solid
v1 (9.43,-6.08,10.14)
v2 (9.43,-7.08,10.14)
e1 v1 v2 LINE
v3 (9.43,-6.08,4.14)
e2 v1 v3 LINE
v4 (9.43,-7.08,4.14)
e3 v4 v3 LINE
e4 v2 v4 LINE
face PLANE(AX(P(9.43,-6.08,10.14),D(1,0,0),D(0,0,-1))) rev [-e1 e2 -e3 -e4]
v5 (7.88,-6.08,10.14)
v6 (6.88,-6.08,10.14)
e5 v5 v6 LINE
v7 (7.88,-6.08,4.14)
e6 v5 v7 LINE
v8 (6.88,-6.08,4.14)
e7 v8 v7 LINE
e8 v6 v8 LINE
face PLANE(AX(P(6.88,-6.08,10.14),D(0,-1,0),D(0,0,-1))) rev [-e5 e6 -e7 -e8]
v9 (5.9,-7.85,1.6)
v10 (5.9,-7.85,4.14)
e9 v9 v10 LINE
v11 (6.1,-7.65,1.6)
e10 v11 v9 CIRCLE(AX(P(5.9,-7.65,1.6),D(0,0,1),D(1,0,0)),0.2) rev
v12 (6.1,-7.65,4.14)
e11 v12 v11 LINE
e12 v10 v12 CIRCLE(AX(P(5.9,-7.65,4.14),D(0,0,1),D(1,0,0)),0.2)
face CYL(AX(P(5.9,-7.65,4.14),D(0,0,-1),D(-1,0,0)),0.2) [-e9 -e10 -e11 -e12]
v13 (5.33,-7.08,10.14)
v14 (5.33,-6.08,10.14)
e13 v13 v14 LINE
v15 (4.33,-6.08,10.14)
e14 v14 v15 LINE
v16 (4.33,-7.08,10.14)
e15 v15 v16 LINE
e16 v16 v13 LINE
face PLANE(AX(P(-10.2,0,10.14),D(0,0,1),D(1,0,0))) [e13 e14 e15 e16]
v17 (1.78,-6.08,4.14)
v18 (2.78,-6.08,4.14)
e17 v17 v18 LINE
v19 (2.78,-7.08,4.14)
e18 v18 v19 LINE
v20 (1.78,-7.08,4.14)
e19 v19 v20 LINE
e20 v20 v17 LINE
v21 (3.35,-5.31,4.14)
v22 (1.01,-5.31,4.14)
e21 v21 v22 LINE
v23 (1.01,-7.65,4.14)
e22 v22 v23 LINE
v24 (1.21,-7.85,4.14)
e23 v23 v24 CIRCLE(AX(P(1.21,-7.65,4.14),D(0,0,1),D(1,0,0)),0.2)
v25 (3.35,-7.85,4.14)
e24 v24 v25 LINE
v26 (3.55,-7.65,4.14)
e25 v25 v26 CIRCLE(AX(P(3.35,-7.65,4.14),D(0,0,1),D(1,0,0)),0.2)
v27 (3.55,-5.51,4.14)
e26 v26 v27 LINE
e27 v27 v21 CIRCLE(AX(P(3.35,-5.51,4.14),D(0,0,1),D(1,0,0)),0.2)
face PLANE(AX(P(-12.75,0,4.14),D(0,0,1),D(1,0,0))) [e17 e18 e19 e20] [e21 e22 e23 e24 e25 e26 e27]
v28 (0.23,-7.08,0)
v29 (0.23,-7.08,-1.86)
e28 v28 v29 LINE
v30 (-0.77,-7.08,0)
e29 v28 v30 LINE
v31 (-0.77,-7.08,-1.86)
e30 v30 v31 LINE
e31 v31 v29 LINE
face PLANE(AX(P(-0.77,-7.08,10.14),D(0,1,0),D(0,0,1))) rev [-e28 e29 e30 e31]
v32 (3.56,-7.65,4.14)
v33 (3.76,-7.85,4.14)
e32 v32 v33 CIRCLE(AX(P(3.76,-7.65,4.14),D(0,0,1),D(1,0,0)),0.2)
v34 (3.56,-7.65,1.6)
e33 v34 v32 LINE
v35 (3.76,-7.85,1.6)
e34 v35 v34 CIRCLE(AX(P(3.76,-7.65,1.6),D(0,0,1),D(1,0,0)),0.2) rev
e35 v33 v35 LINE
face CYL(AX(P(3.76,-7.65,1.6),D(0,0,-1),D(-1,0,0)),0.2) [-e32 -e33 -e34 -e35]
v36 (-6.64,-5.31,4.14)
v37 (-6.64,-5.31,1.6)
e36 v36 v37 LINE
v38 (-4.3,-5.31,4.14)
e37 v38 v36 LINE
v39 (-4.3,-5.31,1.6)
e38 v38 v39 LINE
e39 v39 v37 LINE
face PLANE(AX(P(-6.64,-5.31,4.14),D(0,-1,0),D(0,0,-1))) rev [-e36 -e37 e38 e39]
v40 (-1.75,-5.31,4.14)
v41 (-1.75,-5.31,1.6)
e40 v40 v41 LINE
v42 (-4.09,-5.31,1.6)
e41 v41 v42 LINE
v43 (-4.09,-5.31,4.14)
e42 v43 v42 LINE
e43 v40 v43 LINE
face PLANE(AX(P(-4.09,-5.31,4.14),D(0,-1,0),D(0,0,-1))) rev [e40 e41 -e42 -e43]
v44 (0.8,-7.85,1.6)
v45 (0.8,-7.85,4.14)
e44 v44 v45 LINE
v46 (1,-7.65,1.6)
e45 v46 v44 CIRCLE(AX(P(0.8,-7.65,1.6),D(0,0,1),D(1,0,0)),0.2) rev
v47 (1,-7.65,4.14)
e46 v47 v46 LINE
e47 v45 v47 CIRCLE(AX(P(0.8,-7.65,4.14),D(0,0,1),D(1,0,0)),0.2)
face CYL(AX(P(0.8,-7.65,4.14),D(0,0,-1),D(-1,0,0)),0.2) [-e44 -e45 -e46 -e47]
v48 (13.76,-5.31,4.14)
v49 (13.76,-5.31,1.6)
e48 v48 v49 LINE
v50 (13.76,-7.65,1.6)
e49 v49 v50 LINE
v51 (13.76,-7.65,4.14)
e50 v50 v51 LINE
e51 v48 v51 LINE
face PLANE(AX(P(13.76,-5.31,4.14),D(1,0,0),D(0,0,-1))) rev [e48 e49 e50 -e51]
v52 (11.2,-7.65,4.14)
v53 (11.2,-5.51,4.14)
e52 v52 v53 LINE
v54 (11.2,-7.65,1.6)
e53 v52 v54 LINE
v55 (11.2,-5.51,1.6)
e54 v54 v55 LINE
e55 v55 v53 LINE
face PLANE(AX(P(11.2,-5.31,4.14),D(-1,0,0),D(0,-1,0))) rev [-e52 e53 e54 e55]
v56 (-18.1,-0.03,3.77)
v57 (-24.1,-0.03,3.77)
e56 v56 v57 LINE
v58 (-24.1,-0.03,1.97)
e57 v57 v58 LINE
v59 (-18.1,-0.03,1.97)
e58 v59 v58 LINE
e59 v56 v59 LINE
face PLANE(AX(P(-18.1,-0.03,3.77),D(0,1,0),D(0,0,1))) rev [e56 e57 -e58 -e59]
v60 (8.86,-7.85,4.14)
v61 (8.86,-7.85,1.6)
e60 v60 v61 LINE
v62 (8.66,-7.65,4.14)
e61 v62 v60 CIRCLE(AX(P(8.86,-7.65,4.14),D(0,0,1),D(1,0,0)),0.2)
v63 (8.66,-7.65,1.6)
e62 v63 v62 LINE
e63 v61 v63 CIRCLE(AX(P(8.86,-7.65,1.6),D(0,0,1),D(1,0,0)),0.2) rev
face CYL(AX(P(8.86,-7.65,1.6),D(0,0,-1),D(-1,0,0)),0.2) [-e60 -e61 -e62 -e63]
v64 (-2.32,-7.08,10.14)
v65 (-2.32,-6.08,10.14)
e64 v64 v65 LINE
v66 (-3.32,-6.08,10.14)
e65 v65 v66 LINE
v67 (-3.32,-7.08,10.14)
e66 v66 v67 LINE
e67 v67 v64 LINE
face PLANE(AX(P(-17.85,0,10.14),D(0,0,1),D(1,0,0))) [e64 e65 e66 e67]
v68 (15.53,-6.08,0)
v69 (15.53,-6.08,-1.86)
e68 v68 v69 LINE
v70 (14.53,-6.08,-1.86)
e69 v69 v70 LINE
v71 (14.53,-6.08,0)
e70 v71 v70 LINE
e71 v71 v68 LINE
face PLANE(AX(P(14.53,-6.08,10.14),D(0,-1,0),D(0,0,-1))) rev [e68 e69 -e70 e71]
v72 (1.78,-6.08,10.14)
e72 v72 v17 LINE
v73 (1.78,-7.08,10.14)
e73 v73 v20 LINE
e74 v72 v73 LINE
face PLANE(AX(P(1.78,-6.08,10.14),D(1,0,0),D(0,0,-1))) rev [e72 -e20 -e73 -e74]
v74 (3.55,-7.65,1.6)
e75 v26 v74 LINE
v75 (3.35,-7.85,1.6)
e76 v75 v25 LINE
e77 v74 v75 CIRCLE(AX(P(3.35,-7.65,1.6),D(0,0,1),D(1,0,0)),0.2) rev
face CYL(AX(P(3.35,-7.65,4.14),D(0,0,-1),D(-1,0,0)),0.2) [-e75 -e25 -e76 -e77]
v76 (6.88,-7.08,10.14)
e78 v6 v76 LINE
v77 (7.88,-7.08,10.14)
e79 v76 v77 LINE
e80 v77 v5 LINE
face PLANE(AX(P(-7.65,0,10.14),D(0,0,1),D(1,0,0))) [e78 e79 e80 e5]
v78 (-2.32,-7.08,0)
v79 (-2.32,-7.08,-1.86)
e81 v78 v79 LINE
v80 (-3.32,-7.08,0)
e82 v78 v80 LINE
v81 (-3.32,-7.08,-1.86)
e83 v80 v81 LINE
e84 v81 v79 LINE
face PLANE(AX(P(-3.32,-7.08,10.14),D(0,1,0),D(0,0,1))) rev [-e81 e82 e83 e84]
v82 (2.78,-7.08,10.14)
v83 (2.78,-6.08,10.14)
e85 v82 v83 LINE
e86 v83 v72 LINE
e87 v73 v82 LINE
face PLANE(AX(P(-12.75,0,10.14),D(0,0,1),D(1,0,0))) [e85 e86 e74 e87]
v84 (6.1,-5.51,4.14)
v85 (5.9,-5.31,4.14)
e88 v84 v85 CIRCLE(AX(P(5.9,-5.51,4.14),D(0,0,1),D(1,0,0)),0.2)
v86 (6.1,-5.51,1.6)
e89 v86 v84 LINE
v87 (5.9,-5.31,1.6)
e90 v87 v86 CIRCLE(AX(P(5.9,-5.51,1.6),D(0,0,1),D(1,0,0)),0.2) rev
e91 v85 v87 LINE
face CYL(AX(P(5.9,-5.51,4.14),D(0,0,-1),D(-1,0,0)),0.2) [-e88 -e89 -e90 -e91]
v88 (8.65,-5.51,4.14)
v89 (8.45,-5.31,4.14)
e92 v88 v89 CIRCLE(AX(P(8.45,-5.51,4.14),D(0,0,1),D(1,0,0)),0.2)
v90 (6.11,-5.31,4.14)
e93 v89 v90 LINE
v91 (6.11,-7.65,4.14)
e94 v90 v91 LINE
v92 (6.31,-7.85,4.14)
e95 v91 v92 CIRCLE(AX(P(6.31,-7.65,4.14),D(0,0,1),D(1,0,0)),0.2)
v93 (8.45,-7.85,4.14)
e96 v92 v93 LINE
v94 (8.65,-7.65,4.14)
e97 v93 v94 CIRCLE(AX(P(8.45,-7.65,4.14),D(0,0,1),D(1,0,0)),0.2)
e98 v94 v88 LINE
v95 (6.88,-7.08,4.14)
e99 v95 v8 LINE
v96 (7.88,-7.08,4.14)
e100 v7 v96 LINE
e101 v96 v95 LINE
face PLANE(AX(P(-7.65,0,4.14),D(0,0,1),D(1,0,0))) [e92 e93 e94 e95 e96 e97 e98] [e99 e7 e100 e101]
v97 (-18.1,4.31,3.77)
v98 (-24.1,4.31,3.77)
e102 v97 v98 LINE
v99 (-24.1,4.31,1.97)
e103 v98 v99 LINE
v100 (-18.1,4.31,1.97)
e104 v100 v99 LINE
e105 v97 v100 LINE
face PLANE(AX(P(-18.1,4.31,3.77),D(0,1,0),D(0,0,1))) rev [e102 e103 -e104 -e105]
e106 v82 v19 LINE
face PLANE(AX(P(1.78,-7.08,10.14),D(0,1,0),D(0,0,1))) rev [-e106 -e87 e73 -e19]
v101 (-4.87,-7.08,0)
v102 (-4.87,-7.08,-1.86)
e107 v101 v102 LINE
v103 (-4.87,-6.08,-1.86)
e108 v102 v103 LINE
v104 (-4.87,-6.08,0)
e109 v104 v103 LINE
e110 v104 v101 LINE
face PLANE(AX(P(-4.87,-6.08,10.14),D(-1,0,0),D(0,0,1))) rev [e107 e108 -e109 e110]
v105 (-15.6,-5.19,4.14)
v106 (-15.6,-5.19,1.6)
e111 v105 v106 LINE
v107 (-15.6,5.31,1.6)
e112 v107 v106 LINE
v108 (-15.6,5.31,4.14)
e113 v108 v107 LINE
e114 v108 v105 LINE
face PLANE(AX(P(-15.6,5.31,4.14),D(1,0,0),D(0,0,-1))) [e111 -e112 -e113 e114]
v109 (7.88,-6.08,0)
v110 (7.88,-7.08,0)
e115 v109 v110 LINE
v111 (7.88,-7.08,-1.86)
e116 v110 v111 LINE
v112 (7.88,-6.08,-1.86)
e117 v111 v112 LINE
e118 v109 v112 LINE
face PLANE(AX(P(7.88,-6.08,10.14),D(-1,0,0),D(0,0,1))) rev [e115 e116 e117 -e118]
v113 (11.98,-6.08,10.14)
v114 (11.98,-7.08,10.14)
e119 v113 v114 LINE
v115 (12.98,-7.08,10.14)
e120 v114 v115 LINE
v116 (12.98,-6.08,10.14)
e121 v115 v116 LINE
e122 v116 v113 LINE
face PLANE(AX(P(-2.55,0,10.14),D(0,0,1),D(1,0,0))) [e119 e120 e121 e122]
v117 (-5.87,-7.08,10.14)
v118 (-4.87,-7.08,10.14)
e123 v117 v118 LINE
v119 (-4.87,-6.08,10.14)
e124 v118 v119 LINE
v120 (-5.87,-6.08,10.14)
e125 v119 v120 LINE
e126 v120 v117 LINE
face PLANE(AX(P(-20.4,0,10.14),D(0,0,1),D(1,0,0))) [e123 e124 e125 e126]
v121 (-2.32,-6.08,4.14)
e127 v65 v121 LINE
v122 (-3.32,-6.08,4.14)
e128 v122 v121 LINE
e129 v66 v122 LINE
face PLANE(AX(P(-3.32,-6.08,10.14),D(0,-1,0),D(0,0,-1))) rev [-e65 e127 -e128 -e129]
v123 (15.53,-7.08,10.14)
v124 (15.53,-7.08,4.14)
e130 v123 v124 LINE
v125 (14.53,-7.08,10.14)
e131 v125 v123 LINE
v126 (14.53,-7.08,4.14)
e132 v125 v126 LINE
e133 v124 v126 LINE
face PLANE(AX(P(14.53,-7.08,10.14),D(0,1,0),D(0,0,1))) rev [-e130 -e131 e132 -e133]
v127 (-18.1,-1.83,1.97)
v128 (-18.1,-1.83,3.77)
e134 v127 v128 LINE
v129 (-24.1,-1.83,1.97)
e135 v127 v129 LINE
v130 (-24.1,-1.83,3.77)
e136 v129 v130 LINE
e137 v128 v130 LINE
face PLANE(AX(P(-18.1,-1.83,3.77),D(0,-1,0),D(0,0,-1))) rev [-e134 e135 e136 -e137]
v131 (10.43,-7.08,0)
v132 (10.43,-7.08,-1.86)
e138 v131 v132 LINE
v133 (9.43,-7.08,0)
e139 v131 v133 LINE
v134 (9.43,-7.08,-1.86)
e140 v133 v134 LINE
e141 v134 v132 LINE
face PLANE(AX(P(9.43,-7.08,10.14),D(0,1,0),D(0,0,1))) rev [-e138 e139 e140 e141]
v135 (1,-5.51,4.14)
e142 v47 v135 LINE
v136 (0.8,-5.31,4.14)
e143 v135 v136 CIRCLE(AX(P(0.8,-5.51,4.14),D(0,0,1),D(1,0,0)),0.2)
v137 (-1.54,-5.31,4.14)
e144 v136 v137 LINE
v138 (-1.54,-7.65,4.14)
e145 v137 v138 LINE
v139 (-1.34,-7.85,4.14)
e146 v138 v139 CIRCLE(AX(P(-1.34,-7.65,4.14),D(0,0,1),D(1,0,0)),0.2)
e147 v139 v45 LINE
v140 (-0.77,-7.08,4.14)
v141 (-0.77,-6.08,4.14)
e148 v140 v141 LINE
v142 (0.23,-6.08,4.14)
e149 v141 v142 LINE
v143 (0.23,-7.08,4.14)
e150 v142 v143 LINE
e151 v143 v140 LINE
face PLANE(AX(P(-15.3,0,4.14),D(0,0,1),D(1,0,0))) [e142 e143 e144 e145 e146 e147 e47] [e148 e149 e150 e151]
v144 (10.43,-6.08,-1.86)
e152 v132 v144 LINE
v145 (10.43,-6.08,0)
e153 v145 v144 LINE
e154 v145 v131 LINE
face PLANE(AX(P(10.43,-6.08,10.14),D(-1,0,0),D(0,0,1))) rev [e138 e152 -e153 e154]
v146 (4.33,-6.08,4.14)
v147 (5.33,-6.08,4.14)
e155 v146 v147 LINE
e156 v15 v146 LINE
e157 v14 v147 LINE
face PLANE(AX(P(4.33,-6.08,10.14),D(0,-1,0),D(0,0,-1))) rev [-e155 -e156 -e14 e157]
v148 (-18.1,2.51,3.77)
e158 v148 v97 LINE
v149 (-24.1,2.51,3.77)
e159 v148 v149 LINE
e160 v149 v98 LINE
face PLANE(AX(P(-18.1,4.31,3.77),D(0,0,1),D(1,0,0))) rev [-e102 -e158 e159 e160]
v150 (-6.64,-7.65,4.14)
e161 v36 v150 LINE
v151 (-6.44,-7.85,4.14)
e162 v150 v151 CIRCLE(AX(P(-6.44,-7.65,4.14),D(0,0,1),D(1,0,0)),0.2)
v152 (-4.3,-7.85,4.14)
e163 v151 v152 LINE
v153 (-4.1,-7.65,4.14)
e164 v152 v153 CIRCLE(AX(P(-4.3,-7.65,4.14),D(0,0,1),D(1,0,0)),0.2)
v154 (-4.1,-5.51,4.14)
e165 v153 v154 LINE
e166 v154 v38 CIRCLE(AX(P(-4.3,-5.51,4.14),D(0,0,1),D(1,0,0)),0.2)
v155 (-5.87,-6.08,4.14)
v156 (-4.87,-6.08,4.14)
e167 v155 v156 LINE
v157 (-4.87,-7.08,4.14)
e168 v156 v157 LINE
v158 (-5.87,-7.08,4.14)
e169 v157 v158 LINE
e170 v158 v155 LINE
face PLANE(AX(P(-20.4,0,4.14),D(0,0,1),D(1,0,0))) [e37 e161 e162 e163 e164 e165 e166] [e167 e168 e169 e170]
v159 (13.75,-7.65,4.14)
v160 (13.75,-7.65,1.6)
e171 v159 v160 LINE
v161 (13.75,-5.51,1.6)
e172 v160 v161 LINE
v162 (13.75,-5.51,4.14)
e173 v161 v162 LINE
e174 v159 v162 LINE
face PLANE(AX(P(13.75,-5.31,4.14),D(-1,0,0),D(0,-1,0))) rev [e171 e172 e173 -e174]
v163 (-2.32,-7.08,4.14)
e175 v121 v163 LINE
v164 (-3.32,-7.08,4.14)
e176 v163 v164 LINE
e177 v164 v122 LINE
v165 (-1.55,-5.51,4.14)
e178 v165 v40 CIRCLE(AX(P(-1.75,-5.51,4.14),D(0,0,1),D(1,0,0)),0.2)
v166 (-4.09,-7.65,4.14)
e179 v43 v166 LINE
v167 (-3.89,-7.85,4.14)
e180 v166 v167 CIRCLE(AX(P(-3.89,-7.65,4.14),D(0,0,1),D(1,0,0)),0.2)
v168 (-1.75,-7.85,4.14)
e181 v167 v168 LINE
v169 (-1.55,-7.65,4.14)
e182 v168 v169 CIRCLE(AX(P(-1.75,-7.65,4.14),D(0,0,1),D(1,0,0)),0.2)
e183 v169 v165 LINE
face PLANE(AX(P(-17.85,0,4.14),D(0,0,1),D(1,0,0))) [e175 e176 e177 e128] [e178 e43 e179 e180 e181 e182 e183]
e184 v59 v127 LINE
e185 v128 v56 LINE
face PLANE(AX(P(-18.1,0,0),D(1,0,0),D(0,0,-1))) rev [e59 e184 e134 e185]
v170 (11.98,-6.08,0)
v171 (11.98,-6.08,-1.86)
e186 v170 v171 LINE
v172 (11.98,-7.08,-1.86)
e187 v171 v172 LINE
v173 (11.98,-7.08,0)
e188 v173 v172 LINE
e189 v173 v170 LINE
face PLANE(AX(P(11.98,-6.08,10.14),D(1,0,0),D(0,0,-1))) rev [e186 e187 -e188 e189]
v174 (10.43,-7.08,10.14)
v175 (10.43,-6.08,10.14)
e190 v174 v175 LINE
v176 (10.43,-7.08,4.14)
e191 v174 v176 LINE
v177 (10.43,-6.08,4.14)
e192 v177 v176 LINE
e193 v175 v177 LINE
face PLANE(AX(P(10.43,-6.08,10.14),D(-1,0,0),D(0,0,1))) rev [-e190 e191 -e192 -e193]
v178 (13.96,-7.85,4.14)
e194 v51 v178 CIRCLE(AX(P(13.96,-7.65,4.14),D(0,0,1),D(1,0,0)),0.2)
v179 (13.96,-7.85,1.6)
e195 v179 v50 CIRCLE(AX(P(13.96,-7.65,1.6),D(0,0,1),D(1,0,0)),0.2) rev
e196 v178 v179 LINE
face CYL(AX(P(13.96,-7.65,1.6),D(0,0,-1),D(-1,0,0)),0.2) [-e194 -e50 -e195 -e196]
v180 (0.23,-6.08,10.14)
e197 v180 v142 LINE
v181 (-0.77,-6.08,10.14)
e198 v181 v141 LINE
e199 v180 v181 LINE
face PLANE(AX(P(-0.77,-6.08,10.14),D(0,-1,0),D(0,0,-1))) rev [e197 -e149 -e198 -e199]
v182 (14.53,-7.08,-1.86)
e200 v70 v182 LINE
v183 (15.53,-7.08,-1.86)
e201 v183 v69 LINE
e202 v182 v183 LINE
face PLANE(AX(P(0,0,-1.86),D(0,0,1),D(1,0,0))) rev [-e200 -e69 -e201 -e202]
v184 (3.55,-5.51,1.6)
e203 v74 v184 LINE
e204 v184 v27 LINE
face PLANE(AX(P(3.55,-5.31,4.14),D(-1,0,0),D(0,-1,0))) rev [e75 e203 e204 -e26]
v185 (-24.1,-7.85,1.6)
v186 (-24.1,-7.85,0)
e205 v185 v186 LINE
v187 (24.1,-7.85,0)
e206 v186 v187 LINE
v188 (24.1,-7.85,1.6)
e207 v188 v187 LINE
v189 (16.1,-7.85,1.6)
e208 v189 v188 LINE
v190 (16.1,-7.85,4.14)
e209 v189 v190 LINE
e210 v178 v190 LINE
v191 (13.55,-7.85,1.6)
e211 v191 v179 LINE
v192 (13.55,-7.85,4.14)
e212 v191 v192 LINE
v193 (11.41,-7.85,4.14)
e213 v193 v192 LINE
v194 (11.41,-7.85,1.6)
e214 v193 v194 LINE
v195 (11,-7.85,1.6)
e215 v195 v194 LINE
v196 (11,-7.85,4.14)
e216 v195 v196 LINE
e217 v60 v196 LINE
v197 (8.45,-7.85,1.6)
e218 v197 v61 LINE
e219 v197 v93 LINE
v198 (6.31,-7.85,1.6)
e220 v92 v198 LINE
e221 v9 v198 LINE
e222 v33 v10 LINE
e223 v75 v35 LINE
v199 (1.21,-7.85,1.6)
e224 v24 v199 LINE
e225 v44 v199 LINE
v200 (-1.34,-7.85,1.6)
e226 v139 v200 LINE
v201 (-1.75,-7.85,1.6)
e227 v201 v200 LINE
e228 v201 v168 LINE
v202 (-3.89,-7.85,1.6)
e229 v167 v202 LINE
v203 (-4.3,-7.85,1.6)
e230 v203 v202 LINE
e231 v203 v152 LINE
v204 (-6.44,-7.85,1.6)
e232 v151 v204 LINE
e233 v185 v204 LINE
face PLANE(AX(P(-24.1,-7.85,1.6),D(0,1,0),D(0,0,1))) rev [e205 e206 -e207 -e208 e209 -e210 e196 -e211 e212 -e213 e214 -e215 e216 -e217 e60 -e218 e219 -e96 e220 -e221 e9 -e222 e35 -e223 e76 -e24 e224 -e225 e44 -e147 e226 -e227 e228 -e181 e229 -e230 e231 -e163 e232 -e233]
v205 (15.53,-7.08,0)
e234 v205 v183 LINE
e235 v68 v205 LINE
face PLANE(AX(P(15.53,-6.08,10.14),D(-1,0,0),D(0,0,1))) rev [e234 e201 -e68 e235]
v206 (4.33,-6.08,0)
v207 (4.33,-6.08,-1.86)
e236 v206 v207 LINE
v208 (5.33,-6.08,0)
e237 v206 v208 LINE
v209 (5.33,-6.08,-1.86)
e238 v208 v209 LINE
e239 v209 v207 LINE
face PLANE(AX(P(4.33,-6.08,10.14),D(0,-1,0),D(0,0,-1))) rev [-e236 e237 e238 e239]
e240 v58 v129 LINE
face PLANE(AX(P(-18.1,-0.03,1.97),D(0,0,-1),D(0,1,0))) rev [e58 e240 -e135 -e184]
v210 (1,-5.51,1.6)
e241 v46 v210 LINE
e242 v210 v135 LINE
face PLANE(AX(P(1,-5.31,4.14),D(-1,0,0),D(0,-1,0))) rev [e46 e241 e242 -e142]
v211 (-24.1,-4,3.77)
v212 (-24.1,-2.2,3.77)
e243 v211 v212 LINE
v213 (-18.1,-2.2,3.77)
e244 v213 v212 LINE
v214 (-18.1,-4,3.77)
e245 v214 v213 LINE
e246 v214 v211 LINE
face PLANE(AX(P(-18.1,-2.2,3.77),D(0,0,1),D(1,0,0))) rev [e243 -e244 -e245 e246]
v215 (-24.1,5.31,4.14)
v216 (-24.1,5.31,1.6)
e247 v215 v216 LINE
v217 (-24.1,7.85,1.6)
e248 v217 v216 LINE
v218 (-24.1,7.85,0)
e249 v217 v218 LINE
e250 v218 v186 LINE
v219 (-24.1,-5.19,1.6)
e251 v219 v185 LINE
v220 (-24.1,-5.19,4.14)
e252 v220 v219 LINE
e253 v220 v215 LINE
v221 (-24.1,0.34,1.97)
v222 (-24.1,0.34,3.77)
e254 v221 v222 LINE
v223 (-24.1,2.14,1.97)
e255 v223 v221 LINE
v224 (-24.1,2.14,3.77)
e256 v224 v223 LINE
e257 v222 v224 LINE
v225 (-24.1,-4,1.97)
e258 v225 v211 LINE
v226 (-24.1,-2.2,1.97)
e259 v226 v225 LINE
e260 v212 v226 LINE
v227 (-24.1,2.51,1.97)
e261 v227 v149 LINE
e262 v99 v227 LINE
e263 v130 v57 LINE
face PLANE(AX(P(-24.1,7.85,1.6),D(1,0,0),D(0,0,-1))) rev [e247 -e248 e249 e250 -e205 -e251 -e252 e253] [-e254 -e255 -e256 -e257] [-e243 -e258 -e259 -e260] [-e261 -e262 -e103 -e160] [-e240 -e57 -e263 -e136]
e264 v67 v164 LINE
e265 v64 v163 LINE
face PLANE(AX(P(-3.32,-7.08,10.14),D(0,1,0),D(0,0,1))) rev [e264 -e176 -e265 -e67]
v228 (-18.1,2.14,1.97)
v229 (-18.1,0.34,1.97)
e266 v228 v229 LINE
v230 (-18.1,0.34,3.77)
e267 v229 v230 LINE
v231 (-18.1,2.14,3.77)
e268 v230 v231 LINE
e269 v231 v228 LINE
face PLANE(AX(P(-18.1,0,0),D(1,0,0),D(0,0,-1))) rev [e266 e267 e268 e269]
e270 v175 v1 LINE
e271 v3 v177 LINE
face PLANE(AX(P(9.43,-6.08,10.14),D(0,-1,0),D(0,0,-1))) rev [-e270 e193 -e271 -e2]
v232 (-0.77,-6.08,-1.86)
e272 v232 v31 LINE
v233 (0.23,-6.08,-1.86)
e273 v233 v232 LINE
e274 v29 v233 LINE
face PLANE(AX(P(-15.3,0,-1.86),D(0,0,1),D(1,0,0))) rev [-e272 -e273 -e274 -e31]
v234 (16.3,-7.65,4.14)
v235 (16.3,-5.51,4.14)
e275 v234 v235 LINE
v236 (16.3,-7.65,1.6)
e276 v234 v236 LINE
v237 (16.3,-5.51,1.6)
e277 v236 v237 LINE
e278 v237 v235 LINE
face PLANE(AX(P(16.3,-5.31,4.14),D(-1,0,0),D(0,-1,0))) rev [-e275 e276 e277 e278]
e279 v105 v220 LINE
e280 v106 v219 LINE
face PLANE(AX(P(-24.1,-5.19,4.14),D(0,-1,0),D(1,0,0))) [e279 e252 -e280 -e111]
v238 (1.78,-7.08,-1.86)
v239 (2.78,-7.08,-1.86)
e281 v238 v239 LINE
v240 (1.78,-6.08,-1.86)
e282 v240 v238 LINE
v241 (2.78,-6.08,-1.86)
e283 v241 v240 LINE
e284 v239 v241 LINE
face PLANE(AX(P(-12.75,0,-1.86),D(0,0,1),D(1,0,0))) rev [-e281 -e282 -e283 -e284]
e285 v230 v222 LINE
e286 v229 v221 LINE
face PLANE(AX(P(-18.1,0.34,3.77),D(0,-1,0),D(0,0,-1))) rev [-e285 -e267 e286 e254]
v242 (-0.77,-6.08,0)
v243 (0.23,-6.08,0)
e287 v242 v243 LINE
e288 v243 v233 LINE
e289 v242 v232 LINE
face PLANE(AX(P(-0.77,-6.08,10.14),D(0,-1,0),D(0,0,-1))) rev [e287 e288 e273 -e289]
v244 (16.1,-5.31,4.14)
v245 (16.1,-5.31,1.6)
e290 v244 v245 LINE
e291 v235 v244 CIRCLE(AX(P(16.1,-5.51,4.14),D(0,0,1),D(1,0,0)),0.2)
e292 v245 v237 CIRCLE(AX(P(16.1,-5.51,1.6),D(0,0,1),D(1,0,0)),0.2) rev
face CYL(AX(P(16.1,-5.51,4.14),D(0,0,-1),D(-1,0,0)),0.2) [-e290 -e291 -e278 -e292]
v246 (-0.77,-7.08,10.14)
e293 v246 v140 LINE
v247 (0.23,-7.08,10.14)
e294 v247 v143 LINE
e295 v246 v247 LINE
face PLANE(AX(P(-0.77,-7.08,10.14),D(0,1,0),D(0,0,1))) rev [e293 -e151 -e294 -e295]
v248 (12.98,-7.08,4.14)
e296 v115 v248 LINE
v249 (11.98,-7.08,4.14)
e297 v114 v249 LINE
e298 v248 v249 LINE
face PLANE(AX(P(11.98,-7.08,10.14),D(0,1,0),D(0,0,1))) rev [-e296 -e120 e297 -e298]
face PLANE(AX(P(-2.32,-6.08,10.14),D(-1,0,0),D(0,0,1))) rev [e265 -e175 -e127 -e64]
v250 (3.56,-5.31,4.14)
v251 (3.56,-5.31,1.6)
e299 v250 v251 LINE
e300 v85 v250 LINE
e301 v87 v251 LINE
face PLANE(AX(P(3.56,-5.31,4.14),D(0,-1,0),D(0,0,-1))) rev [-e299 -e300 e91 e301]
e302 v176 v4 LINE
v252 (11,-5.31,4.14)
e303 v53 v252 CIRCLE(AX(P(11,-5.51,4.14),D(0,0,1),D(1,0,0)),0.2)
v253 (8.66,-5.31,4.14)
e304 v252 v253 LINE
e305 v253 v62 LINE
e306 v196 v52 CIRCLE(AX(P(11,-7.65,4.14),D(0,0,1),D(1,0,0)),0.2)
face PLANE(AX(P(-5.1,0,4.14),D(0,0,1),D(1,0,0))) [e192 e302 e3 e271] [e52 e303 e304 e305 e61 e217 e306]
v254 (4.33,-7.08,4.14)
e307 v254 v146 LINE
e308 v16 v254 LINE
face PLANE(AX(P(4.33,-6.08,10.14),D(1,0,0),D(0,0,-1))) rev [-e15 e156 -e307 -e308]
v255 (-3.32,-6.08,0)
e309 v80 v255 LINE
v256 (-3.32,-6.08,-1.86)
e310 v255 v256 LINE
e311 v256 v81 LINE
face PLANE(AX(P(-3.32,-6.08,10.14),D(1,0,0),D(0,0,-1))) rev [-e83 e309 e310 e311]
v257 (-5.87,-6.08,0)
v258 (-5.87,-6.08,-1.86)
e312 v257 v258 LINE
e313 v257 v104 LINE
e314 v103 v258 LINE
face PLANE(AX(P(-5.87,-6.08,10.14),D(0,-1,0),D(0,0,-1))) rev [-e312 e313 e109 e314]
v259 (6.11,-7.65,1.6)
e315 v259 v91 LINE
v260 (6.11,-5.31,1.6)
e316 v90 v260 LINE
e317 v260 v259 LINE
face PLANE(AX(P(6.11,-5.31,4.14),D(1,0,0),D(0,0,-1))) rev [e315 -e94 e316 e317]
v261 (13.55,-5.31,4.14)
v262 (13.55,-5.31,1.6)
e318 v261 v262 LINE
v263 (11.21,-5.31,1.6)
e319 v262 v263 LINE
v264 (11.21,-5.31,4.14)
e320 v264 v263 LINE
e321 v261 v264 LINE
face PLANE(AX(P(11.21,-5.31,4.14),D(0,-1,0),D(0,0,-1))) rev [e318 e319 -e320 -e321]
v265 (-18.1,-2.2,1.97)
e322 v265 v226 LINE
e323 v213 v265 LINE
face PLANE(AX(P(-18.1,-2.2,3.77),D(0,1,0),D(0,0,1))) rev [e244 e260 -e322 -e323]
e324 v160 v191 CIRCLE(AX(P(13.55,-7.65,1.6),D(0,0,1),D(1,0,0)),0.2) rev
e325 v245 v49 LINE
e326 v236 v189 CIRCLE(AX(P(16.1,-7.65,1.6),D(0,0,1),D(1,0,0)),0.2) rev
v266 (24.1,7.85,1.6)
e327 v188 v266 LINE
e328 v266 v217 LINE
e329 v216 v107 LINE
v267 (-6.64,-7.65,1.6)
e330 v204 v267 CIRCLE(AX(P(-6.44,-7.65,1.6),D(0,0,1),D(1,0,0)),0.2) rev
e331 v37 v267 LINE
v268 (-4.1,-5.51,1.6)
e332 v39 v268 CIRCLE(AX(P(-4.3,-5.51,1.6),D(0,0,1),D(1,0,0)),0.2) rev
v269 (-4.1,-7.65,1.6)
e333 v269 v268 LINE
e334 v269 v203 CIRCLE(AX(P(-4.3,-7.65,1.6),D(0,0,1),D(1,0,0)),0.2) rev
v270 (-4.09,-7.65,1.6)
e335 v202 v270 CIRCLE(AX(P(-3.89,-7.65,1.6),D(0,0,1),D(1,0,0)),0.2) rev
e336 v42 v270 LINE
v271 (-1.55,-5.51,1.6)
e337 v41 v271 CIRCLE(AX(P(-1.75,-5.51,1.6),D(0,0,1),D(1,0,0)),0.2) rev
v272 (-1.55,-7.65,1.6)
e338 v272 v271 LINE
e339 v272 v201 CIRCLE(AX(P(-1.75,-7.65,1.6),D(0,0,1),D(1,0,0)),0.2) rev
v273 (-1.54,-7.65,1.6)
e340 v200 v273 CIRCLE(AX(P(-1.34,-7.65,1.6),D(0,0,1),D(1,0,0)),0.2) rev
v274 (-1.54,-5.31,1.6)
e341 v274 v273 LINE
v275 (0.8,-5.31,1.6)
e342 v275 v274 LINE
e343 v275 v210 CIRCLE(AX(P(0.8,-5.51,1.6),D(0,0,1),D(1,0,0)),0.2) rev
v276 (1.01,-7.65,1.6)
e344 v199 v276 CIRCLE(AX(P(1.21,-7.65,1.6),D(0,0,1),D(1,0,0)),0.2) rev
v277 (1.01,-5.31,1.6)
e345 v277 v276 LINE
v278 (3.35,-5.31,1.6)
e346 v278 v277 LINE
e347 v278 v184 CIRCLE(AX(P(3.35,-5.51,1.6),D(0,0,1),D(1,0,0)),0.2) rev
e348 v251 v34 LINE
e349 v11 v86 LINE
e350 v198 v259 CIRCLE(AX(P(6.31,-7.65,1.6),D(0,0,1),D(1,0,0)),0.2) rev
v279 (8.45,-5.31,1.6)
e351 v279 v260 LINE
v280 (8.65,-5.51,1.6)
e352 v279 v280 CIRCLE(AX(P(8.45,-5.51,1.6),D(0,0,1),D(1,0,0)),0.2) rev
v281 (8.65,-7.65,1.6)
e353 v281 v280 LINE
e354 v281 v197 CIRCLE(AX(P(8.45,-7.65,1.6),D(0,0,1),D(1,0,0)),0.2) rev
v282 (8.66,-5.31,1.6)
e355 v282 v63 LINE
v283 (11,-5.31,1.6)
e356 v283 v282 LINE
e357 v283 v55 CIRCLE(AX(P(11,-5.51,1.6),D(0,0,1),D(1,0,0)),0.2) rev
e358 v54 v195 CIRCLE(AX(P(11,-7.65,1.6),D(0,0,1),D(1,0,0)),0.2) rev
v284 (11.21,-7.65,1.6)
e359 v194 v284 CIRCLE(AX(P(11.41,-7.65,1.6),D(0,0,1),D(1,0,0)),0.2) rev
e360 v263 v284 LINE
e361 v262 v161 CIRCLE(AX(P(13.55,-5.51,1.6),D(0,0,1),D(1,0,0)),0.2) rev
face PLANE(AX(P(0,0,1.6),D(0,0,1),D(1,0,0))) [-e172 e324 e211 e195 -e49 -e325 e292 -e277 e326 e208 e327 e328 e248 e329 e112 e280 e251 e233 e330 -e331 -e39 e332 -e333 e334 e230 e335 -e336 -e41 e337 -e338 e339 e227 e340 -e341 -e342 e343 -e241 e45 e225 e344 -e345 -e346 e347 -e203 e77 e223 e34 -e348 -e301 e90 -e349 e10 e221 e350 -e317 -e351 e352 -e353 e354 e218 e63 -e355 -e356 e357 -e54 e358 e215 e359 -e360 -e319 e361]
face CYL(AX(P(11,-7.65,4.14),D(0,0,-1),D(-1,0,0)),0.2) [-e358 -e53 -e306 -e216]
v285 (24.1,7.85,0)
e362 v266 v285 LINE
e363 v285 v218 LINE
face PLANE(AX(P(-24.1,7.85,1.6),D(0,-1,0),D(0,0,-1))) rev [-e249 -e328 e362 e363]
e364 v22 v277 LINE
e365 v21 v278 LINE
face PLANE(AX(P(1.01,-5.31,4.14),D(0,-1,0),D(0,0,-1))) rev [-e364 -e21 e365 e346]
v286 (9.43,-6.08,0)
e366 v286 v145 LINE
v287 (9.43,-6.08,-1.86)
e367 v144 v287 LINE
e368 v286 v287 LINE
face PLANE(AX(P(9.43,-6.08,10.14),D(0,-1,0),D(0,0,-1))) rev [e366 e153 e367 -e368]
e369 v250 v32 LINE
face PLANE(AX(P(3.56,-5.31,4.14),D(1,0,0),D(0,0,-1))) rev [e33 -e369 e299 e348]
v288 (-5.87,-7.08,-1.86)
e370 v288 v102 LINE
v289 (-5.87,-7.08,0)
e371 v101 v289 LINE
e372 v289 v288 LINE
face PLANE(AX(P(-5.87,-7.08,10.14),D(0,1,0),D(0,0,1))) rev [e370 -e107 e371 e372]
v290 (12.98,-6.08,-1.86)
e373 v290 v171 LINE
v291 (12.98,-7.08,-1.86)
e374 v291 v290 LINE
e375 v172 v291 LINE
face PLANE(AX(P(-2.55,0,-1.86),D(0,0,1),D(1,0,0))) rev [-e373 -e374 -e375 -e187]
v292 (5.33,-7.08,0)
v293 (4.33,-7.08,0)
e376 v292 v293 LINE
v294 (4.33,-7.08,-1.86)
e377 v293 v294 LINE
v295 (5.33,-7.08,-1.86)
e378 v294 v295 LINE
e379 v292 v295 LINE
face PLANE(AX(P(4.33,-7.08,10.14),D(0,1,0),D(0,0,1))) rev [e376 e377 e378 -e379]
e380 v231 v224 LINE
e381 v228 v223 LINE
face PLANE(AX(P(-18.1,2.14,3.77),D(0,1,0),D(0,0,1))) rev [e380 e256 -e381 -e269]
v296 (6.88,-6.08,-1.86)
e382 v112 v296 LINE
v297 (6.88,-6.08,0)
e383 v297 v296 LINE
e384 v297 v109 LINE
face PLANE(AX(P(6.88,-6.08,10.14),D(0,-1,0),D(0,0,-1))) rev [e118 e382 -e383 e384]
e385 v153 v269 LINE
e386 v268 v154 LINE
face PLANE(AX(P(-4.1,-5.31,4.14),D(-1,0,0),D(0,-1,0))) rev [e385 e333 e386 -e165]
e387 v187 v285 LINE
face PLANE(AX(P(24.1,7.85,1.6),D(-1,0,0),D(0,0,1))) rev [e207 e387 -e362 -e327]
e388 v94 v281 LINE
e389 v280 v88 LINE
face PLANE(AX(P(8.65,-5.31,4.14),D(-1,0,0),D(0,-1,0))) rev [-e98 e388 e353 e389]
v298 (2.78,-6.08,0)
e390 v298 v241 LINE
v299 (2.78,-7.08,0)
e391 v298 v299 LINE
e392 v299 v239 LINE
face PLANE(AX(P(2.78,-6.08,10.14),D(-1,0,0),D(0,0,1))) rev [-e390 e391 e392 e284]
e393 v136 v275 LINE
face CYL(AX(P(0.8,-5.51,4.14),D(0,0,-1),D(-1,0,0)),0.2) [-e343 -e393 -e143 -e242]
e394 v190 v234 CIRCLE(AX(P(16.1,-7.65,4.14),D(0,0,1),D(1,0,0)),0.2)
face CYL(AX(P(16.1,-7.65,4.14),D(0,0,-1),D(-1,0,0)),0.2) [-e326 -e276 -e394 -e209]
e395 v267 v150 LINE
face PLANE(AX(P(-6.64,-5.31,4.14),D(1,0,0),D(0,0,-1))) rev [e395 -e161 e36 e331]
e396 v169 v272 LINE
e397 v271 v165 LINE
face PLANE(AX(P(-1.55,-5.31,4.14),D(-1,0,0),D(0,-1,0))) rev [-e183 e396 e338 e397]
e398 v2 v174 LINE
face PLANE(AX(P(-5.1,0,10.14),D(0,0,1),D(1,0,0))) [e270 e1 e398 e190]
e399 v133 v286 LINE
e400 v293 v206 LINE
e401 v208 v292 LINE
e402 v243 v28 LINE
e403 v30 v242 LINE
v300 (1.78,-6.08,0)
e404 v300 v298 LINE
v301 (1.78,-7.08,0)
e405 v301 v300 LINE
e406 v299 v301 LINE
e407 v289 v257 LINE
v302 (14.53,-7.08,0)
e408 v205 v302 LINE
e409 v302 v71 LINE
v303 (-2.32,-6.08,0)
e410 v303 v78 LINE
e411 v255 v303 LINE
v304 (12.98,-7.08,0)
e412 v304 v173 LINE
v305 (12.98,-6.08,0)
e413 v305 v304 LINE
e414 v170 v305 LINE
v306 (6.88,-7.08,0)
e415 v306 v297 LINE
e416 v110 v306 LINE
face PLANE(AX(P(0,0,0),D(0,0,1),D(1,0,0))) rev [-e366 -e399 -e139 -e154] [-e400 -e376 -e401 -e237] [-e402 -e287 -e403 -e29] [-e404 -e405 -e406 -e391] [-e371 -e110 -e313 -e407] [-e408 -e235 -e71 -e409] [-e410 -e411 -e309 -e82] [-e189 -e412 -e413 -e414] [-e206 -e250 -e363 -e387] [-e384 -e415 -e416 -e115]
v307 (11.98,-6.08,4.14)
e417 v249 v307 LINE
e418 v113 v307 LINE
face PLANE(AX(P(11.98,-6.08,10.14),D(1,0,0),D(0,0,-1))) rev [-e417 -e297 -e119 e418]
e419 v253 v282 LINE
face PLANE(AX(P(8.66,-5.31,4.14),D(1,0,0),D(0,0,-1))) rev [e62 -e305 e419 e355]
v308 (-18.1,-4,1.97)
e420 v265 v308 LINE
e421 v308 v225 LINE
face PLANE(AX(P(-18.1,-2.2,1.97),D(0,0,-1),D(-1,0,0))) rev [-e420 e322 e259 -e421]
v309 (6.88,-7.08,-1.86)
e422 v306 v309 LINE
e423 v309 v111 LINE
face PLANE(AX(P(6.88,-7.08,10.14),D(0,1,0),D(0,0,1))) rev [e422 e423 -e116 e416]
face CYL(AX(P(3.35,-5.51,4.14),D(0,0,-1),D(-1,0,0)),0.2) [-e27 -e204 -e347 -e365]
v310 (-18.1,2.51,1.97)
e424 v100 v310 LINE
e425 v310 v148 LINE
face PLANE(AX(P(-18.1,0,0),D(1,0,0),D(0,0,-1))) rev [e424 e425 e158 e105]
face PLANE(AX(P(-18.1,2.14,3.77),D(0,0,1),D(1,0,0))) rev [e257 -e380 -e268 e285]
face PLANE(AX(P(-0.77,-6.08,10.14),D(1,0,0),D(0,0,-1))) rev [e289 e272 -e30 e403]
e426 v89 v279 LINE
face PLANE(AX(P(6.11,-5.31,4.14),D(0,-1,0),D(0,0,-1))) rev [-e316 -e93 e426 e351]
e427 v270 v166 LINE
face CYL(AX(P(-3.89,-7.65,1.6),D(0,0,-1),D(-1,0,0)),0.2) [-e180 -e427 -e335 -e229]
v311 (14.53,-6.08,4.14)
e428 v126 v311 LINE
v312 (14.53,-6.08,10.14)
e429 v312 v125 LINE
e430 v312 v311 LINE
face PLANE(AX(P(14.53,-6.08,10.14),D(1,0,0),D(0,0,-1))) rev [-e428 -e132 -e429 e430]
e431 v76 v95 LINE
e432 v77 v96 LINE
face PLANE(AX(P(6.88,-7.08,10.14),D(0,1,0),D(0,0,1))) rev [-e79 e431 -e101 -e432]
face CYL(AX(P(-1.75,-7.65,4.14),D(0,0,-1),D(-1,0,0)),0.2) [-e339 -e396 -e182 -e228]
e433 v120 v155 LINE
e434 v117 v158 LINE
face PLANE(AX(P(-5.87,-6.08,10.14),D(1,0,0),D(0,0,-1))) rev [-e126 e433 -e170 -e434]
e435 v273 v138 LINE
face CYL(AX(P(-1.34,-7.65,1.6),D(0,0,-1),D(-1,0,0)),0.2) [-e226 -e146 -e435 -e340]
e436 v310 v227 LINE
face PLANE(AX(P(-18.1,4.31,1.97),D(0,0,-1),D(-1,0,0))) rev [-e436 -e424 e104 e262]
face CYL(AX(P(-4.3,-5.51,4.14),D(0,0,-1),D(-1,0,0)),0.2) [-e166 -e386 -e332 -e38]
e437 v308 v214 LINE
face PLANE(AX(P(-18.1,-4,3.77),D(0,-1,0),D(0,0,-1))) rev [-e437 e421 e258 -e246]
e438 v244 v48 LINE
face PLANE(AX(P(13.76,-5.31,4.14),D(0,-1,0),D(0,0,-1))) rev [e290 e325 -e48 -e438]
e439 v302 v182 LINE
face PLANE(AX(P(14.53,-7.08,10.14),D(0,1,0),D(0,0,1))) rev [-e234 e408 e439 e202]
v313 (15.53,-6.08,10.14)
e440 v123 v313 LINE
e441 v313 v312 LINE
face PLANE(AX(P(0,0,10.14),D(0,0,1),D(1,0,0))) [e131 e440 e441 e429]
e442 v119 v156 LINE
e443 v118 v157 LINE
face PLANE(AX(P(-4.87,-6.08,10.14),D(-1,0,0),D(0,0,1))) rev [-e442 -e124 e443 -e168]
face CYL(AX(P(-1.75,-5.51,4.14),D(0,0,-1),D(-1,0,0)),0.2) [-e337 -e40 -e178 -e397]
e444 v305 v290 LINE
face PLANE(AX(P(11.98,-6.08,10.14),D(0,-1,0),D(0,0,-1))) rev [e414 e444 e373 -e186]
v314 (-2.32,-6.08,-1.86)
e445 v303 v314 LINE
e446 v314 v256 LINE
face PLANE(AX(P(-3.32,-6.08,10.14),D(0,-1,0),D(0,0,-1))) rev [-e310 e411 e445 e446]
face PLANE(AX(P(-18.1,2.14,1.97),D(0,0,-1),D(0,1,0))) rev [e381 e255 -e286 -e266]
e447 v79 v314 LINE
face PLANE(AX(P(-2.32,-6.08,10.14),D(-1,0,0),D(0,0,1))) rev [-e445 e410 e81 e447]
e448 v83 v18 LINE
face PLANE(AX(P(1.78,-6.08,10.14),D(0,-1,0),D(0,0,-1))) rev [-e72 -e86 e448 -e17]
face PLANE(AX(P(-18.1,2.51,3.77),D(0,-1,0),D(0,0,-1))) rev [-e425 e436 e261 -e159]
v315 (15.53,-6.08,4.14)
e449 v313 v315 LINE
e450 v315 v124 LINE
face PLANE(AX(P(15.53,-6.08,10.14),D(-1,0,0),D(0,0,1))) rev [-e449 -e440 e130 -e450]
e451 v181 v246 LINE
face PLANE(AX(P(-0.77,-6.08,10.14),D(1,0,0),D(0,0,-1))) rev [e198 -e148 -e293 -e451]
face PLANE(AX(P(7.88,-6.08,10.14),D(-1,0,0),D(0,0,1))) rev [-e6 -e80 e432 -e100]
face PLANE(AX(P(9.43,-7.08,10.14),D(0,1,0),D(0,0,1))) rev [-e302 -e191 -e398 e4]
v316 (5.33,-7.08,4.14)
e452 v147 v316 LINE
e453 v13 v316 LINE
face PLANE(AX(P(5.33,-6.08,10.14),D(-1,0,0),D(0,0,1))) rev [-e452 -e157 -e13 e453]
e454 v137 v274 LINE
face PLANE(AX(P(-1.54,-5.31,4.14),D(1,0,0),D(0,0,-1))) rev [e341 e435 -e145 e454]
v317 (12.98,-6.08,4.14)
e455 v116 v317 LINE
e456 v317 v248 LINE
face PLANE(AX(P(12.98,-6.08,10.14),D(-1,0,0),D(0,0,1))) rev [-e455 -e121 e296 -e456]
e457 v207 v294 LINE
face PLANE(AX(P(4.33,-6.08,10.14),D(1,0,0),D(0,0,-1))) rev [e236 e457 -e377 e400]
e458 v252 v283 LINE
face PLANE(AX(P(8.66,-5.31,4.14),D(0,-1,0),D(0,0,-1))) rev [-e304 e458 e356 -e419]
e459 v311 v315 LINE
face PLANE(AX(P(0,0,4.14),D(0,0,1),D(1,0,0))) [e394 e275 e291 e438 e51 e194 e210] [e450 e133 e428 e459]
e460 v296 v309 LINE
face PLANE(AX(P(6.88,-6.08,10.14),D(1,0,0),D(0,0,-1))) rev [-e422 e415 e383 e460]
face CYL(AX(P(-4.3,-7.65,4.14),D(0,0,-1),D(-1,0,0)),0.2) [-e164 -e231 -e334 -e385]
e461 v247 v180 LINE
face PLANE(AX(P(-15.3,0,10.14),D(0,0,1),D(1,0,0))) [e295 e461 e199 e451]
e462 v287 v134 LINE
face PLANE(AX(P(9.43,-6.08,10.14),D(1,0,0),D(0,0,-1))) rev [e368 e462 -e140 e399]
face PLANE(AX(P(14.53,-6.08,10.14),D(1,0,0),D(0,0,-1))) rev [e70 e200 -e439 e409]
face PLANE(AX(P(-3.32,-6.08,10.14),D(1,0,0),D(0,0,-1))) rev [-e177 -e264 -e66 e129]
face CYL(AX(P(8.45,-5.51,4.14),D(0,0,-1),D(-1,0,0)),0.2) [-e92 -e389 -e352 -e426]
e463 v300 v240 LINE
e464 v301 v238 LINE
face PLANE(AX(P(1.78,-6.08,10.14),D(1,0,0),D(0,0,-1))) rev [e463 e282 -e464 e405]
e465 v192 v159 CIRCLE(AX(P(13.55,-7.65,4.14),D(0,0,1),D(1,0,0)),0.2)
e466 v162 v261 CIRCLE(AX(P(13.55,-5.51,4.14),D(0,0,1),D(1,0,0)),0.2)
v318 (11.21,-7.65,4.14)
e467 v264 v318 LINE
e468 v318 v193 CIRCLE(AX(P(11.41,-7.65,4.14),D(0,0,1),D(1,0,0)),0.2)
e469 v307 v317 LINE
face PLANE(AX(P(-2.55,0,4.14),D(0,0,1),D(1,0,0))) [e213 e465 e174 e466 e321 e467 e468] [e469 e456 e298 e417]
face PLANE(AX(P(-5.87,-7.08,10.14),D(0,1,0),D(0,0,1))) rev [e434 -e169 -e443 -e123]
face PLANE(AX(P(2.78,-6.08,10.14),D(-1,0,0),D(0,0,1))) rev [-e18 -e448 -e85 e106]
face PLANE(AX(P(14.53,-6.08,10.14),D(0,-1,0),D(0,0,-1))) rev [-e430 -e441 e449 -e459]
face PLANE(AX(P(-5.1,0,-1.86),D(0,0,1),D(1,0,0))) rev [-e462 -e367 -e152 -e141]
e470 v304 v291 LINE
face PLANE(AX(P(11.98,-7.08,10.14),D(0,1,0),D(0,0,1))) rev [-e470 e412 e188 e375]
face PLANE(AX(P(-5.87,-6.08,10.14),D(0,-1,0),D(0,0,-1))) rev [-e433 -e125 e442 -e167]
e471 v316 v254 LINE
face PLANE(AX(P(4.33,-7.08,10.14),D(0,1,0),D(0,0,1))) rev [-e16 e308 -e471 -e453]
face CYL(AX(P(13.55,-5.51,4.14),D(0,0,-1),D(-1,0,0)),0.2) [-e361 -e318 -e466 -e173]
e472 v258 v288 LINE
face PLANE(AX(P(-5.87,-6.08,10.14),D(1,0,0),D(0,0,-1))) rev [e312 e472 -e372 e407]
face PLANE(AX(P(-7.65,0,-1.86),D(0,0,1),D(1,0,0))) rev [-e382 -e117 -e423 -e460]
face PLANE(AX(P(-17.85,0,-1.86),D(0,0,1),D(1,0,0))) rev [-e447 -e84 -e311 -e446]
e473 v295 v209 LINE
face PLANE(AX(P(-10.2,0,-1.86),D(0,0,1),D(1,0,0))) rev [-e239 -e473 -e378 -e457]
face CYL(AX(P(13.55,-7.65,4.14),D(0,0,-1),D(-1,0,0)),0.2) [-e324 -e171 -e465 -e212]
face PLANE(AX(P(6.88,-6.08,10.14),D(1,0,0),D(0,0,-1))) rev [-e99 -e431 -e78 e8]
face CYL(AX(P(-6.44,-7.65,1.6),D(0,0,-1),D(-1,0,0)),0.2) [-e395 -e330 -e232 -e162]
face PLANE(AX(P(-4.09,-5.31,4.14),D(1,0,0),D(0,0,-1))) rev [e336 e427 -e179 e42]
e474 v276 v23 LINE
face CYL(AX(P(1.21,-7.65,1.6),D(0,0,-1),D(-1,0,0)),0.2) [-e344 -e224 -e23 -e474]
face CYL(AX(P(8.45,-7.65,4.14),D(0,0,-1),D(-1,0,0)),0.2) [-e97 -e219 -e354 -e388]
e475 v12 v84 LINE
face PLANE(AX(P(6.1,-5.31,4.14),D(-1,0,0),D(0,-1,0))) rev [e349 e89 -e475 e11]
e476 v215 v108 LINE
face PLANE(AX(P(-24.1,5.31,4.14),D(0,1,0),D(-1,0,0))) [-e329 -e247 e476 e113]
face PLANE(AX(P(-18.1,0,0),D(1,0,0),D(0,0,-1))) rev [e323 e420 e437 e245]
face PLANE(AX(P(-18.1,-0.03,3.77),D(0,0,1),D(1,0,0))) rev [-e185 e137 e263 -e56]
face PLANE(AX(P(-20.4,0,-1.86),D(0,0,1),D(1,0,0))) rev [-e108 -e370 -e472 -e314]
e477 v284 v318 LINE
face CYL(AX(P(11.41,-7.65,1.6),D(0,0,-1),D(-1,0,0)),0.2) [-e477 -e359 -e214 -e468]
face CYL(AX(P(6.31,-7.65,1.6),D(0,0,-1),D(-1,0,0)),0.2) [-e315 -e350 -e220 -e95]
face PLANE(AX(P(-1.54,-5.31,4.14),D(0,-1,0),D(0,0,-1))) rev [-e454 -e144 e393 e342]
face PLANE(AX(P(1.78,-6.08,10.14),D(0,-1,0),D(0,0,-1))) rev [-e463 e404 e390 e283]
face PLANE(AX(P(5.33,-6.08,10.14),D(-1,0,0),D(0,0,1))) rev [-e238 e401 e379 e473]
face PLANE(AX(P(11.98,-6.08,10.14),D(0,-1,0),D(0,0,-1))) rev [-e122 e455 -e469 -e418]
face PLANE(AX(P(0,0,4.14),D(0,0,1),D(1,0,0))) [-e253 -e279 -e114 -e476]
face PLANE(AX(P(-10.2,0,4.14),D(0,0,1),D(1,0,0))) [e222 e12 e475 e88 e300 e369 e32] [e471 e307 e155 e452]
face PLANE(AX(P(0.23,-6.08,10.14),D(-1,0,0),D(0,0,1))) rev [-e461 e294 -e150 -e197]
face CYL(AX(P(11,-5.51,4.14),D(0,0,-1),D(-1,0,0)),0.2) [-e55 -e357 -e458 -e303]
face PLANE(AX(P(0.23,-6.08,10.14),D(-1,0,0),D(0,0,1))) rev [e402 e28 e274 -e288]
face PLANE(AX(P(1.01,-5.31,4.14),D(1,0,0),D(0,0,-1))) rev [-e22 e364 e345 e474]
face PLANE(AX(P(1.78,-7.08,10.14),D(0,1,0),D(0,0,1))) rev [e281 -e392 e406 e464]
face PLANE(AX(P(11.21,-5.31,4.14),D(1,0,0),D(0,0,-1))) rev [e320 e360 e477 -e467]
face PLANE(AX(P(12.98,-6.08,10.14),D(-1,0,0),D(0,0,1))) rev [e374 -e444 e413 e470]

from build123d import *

# Parameters (mm, degrees)
SKETCH1_W             = 48.2
SKETCH1_H             = 15.7
MAIN_DEPTH            = 1.6
SKETCH2_W             = 2.54
SKETCH2_H             = 2.54
PINBASE_DEPTH         = 2.54
FILLET1_R             = 0.2
SKETCH3_W             = 1
SKETCH3_H             = 1
BOSS_EXTRUDE3_DEPTH   = 6
LPATTERN3_START       = 1.6
LPATTERN3_DEPTH       = 2.54
LPATTERN3_START_2     = -1.86
LPATTERN3_2_OUTLINE_W = 1
LPATTERN3_2_OUTLINE_H = 1
LPATTERN3_2_DEPTH     = 12
SKETCH5_W             = 8.5
SKETCH5_H             = 10.5
BOSS_EXTRUDE4_DEPTH   = 2.54
SKETCH6_W             = 1.8
SKETCH6_H             = 1.8
CUT_EXTRUDE1_DEPTH    = 6


# Read off the part's stored shape, not the designer's step: LPattern3
with BuildPart() as part:
    # Sketch1 → Main (new body)
    with BuildSketch(Plane.XY):
        Rectangle(SKETCH1_W, SKETCH1_H)
    extrude(amount=MAIN_DEPTH)

    # Sketch2 → PinBase (add)
    with BuildSketch(Plane.XY.offset(1.6)):
        with Locations((15.03, -6.58)):
            Rectangle(SKETCH2_W, SKETCH2_H)
    extrude(amount=PINBASE_DEPTH)

    # Fillet1
    fillet1_edges = [part.edges().sort_by_distance(p)[0] for p in [
        (13.76, -7.85, 2.87),
        (16.3, -7.85, 2.87),
        (16.3, -5.31, 2.87),
    ]]
    fillet(fillet1_edges, radius=FILLET1_R)

    # Sketch3 → Boss-Extrude3 (add, symmetric)
    with BuildSketch(Plane.XY.offset(4.14)):
        with Locations((15.03, -6.58)):
            Rectangle(SKETCH3_W, SKETCH3_H)
    extrude(amount=BOSS_EXTRUDE3_DEPTH, both=True)

    # LPattern3 outline → LPattern3 (add)
    with BuildSketch(Plane.XY.offset(LPATTERN3_START)):
        with BuildLine():
            Line((-6.44, -7.85), (-4.3, -7.85))
            ThreePointArc((-4.3, -7.85), (-4.158578644, -7.791421356), (-4.1, -7.65))
            Line((-4.1, -7.65), (-4.1, -5.51))
            ThreePointArc((-4.1, -5.51), (-4.158578644, -5.368578644), (-4.3, -5.31))
            Line((-4.3, -5.31), (-6.64, -5.31))
            Line((-6.64, -5.31), (-6.64, -7.65))
            ThreePointArc((-6.64, -7.65), (-6.581421356, -7.791421356), (-6.44, -7.85))
        make_face()
        with BuildLine():
            Line((-3.89, -7.85), (-1.75, -7.85))
            ThreePointArc((-1.75, -7.85), (-1.608578644, -7.791421356), (-1.55, -7.65))
            Line((-1.55, -7.65), (-1.55, -5.51))
            ThreePointArc((-1.55, -5.51), (-1.608578644, -5.368578644), (-1.75, -5.31))
            Line((-1.75, -5.31), (-4.09, -5.31))
            Line((-4.09, -5.31), (-4.09, -7.65))
            ThreePointArc((-4.09, -7.65), (-4.031421356, -7.791421356), (-3.89, -7.85))
        make_face()
        with BuildLine():
            Line((-1.34, -7.85), (0.8, -7.85))
            ThreePointArc((0.8, -7.85), (0.941421356, -7.791421356), (1, -7.65))
            Line((1, -7.65), (1, -5.51))
            ThreePointArc((1, -5.51), (0.941421356, -5.368578644), (0.8, -5.31))
            Line((0.8, -5.31), (-1.54, -5.31))
            Line((-1.54, -5.31), (-1.54, -7.65))
            ThreePointArc((-1.54, -7.65), (-1.481421356, -7.791421356), (-1.34, -7.85))
        make_face()
        with BuildLine():
            Line((1.21, -7.85), (3.35, -7.85))
            ThreePointArc((3.35, -7.85), (3.491421356, -7.791421356), (3.55, -7.65))
            Line((3.55, -7.65), (3.55, -5.51))
            ThreePointArc((3.55, -5.51), (3.491421356, -5.368578644), (3.35, -5.31))
            Line((3.35, -5.31), (1.01, -5.31))
            Line((1.01, -5.31), (1.01, -7.65))
            ThreePointArc((1.01, -7.65), (1.068578644, -7.791421356), (1.21, -7.85))
        make_face()
        with BuildLine():
            Line((3.76, -7.85), (5.9, -7.85))
            ThreePointArc((5.9, -7.85), (6.041421356, -7.791421356), (6.1, -7.65))
            Line((6.1, -7.65), (6.1, -5.51))
            ThreePointArc((6.1, -5.51), (6.041421356, -5.368578644), (5.9, -5.31))
            Line((5.9, -5.31), (3.56, -5.31))
            Line((3.56, -5.31), (3.56, -7.65))
            ThreePointArc((3.56, -7.65), (3.618578644, -7.791421356), (3.76, -7.85))
        make_face()
        with BuildLine():
            Line((6.31, -7.85), (8.45, -7.85))
            ThreePointArc((8.45, -7.85), (8.591421356, -7.791421356), (8.65, -7.65))
            Line((8.65, -7.65), (8.65, -5.51))
            ThreePointArc((8.65, -5.51), (8.591421356, -5.368578644), (8.45, -5.31))
            Line((8.45, -5.31), (6.11, -5.31))
            Line((6.11, -5.31), (6.11, -7.65))
            ThreePointArc((6.11, -7.65), (6.168578644, -7.791421356), (6.31, -7.85))
        make_face()
        with BuildLine():
            Line((8.86, -7.85), (11, -7.85))
            ThreePointArc((11, -7.85), (11.141421356, -7.791421356), (11.2, -7.65))
            Line((11.2, -7.65), (11.2, -5.51))
            ThreePointArc((11.2, -5.51), (11.141421356, -5.368578644), (11, -5.31))
            Line((11, -5.31), (8.66, -5.31))
            Line((8.66, -5.31), (8.66, -7.65))
            ThreePointArc((8.66, -7.65), (8.718578644, -7.791421356), (8.86, -7.85))
        make_face()
        with BuildLine():
            Line((11.41, -7.85), (13.55, -7.85))
            ThreePointArc((13.55, -7.85), (13.691421356, -7.791421356), (13.75, -7.65))
            Line((13.75, -7.65), (13.75, -5.51))
            ThreePointArc((13.75, -5.51), (13.691421356, -5.368578644), (13.55, -5.31))
            Line((13.55, -5.31), (11.21, -5.31))
            Line((11.21, -5.31), (11.21, -7.65))
            ThreePointArc((11.21, -7.65), (11.268578644, -7.791421356), (11.41, -7.85))
        make_face()
    extrude(amount=LPATTERN3_DEPTH)

    # LPattern3 2 outline → LPattern3 2 (add)
    with BuildSketch(Plane.XY.offset(LPATTERN3_START_2)):
        with Locations((12.48, -6.58)):
            Rectangle(LPATTERN3_2_OUTLINE_W, LPATTERN3_2_OUTLINE_H)
        with Locations((9.93, -6.58)):
            Rectangle(LPATTERN3_2_OUTLINE_W, LPATTERN3_2_OUTLINE_H)
        with Locations((7.38, -6.58)):
            Rectangle(LPATTERN3_2_OUTLINE_W, LPATTERN3_2_OUTLINE_H)
        with Locations((4.83, -6.58)):
            Rectangle(LPATTERN3_2_OUTLINE_W, LPATTERN3_2_OUTLINE_H)
        with Locations((2.28, -6.58)):
            Rectangle(LPATTERN3_2_OUTLINE_W, LPATTERN3_2_OUTLINE_H)
        with Locations((-0.27, -6.58)):
            Rectangle(LPATTERN3_2_OUTLINE_W, LPATTERN3_2_OUTLINE_H)
        with Locations((-2.82, -6.58)):
            Rectangle(LPATTERN3_2_OUTLINE_W, LPATTERN3_2_OUTLINE_H)
        with Locations((-5.37, -6.58)):
            Rectangle(LPATTERN3_2_OUTLINE_W, LPATTERN3_2_OUTLINE_H)
    extrude(amount=LPATTERN3_2_DEPTH)

    # Sketch5 → Boss-Extrude4 (add)
    with BuildSketch(Plane(origin=(-48.2, 0, 1.6), x_dir=(-1, 0, 0), z_dir=(0, 0, -1))):
        with Locations((-28.35, 0.06)):
            Rectangle(SKETCH5_W, SKETCH5_H)
    extrude(amount=-BOSS_EXTRUDE4_DEPTH)

    # Sketch6 → Cut-Extrude1 (cut)
    with BuildSketch(Plane.ZY.offset(24.1)):
        with Locations((2.87, 3.41)):
            Rectangle(SKETCH6_W, SKETCH6_H)
        with Locations((2.87, 1.24)):
            Rectangle(SKETCH6_W, SKETCH6_H)
        with Locations((2.87, -0.93)):
            Rectangle(SKETCH6_W, SKETCH6_H)
        with Locations((2.87, -3.1)):
            Rectangle(SKETCH6_W, SKETCH6_H)
    extrude(amount=-CUT_EXTRUDE1_DEPTH, mode=Mode.SUBTRACT)


solid = part.part
